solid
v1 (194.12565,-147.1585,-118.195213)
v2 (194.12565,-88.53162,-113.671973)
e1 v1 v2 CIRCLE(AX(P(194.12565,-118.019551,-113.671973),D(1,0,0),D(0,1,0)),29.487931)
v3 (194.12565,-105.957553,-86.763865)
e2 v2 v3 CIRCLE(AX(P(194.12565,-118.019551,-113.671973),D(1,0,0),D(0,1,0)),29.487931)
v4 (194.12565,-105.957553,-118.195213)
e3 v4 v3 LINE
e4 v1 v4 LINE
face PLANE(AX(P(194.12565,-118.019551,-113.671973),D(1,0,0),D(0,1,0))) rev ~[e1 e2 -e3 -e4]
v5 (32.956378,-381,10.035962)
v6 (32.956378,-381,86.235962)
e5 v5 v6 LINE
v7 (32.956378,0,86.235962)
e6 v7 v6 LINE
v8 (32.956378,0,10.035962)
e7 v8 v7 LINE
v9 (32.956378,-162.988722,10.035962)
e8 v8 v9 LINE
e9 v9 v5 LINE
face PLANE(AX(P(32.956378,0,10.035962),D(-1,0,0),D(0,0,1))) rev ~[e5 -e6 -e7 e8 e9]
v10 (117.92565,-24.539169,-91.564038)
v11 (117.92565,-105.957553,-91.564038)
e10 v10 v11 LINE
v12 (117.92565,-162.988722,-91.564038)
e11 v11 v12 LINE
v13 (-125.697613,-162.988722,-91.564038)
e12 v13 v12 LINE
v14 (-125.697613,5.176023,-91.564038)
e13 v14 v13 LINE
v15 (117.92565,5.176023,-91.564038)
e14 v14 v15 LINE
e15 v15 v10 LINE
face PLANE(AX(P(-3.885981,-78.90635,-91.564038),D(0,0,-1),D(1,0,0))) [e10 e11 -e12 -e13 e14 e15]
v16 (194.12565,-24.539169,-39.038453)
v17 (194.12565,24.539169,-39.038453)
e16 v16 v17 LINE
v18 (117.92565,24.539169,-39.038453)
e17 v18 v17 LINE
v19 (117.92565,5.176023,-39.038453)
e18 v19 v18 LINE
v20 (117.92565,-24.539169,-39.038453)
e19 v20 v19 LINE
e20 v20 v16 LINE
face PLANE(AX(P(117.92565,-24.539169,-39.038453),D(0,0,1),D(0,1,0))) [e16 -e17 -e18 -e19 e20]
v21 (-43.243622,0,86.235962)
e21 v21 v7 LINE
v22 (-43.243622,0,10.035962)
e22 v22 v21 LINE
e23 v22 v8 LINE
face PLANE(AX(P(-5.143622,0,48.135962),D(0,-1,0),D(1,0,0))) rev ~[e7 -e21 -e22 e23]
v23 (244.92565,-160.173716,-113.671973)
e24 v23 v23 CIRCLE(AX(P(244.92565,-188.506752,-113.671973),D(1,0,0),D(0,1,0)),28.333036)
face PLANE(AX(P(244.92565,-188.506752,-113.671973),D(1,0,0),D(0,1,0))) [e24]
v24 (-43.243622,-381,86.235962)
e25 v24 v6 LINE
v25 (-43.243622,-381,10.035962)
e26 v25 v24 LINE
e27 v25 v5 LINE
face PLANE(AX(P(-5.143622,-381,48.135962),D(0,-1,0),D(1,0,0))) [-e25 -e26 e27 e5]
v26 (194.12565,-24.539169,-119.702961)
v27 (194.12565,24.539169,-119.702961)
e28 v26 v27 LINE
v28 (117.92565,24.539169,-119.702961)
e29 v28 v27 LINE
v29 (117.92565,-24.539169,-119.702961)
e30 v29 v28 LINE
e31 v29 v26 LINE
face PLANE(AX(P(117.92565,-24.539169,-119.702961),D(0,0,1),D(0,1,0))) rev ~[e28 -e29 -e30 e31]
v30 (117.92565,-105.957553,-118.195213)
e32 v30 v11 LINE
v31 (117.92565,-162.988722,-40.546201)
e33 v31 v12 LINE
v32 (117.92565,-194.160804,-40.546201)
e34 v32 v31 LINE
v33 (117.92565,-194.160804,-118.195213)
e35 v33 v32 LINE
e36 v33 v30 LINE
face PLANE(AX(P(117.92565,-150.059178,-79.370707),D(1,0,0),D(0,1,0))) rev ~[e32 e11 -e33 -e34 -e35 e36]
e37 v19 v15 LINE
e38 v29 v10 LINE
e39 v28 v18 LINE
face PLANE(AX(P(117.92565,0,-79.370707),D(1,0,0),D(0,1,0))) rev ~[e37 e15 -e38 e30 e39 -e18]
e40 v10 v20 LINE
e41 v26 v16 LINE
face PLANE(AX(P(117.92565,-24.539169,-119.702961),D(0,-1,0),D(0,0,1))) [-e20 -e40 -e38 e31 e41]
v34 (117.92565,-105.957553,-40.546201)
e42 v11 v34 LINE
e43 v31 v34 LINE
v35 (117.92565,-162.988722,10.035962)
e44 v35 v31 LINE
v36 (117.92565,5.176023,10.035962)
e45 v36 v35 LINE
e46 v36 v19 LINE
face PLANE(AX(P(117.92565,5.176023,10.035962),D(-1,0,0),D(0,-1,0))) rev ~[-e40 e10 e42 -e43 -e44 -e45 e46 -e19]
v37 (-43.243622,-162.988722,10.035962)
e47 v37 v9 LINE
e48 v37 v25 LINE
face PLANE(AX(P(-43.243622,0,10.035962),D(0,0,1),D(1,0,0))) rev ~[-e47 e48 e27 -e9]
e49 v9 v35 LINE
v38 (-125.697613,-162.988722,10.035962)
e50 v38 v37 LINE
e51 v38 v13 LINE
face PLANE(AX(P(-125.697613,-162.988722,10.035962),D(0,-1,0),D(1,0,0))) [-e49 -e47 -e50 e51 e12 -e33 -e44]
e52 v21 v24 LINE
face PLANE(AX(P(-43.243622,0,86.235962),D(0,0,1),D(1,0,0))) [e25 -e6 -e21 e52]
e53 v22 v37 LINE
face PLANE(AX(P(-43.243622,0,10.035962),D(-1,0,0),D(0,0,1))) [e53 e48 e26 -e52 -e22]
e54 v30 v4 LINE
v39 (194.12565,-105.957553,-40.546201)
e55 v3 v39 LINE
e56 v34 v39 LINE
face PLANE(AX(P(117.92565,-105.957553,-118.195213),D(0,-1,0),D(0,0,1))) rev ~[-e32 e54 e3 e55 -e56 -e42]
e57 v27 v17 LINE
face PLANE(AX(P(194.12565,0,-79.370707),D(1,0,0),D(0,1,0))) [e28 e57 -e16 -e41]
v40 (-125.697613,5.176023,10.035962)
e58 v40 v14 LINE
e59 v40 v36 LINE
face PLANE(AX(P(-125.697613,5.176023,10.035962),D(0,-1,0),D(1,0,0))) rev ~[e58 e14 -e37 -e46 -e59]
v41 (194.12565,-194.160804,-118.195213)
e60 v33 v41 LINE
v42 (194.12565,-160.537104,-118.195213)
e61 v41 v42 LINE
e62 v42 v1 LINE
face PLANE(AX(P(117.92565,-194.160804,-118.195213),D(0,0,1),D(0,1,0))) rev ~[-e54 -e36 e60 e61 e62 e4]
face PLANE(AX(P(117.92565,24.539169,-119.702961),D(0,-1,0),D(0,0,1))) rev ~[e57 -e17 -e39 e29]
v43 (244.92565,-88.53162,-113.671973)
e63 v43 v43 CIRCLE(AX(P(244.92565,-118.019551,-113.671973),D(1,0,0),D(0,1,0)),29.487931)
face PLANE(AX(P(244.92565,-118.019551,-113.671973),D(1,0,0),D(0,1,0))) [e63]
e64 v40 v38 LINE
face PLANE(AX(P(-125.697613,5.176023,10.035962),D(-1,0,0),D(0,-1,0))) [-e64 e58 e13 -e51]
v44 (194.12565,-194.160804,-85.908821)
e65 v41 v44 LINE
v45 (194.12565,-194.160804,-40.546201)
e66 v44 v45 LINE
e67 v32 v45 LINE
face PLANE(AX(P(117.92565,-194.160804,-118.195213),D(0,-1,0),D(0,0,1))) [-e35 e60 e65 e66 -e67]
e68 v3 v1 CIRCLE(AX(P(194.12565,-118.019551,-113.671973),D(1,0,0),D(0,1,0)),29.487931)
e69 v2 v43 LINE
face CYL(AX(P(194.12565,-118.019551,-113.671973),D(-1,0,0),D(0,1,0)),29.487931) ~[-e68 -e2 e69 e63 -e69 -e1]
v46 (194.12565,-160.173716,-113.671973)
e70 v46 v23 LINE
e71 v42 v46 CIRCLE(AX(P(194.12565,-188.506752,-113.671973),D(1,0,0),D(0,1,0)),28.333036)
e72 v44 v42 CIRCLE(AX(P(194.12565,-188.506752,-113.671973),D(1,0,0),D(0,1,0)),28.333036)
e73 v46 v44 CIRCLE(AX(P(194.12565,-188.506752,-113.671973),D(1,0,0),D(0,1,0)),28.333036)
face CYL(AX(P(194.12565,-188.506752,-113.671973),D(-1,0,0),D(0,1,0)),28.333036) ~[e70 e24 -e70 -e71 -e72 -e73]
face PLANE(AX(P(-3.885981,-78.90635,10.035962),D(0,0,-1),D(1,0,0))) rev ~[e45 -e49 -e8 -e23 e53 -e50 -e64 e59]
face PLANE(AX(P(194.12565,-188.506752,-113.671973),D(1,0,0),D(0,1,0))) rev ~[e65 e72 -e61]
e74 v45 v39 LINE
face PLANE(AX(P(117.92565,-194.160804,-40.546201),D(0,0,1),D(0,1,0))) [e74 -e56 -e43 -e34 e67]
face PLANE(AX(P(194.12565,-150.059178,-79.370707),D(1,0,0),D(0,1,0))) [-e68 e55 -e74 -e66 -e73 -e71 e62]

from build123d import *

# Parameters (mm, degrees)
F0_W     = 76.2
F0_H     = 76.2
F1_DEPTH = 381
F4_W     = 243.6232632026
F4_H     = 168.1647449732
F5_DEPTH = 101.6
F6_W     = 88.2032513618
F6_H     = 77.649012208
F6_W_2   = 49.0783378482
F6_H_2   = 80.6645080447
F7_DEPTH = 76.2
F8_R     = 28.3330362408
F8_R_2   = 29.4879309961
F9_DEPTH = 50.8


# Not quite as in the source:
# - the program builds the solid bodies; features that only make, move or delete a surface that nothing else refers to are left out


with BuildPart() as f1:
    # F0 (on Front) → F1 (new body)
    with BuildSketch(Plane.XZ):
        with Locations((-5.1436224073, 48.1359618664)):
            Rectangle(F0_W, F0_H)
    extrude(amount=F1_DEPTH)

    # F4 (on face) → F5 (join)
    with BuildSketch(Plane(origin=(0, 0, 10.0359618664), x_dir=(1, 0, 0), z_dir=(0, 0, -1))):
        with Locations((-3.8859811611, 78.9063498378)):
            Rectangle(F4_W, F4_H)
    extrude(amount=F5_DEPTH)

    # F6 (on face) → F7 (join)
    with BuildSketch(Plane.YZ.offset(117.9256504402)):
        with Locations((-150.0591784716, -79.3707072735)):
            Rectangle(F6_W, F6_H)
        with Locations((0, -79.3707072735)):
            Rectangle(F6_W_2, F6_H_2)
    extrude(amount=F7_DEPTH)

    # F8 (on face) → F9 (join)
    with BuildSketch(Plane.YZ.offset(194.1256504402)):
        with Locations((-188.5067522526, -113.6719733477)):
            Circle(F8_R)
        with Locations((-118.0195510387, -113.6719733477)):
            Circle(F8_R_2)
    extrude(amount=F9_DEPTH)


solid = f1.part
